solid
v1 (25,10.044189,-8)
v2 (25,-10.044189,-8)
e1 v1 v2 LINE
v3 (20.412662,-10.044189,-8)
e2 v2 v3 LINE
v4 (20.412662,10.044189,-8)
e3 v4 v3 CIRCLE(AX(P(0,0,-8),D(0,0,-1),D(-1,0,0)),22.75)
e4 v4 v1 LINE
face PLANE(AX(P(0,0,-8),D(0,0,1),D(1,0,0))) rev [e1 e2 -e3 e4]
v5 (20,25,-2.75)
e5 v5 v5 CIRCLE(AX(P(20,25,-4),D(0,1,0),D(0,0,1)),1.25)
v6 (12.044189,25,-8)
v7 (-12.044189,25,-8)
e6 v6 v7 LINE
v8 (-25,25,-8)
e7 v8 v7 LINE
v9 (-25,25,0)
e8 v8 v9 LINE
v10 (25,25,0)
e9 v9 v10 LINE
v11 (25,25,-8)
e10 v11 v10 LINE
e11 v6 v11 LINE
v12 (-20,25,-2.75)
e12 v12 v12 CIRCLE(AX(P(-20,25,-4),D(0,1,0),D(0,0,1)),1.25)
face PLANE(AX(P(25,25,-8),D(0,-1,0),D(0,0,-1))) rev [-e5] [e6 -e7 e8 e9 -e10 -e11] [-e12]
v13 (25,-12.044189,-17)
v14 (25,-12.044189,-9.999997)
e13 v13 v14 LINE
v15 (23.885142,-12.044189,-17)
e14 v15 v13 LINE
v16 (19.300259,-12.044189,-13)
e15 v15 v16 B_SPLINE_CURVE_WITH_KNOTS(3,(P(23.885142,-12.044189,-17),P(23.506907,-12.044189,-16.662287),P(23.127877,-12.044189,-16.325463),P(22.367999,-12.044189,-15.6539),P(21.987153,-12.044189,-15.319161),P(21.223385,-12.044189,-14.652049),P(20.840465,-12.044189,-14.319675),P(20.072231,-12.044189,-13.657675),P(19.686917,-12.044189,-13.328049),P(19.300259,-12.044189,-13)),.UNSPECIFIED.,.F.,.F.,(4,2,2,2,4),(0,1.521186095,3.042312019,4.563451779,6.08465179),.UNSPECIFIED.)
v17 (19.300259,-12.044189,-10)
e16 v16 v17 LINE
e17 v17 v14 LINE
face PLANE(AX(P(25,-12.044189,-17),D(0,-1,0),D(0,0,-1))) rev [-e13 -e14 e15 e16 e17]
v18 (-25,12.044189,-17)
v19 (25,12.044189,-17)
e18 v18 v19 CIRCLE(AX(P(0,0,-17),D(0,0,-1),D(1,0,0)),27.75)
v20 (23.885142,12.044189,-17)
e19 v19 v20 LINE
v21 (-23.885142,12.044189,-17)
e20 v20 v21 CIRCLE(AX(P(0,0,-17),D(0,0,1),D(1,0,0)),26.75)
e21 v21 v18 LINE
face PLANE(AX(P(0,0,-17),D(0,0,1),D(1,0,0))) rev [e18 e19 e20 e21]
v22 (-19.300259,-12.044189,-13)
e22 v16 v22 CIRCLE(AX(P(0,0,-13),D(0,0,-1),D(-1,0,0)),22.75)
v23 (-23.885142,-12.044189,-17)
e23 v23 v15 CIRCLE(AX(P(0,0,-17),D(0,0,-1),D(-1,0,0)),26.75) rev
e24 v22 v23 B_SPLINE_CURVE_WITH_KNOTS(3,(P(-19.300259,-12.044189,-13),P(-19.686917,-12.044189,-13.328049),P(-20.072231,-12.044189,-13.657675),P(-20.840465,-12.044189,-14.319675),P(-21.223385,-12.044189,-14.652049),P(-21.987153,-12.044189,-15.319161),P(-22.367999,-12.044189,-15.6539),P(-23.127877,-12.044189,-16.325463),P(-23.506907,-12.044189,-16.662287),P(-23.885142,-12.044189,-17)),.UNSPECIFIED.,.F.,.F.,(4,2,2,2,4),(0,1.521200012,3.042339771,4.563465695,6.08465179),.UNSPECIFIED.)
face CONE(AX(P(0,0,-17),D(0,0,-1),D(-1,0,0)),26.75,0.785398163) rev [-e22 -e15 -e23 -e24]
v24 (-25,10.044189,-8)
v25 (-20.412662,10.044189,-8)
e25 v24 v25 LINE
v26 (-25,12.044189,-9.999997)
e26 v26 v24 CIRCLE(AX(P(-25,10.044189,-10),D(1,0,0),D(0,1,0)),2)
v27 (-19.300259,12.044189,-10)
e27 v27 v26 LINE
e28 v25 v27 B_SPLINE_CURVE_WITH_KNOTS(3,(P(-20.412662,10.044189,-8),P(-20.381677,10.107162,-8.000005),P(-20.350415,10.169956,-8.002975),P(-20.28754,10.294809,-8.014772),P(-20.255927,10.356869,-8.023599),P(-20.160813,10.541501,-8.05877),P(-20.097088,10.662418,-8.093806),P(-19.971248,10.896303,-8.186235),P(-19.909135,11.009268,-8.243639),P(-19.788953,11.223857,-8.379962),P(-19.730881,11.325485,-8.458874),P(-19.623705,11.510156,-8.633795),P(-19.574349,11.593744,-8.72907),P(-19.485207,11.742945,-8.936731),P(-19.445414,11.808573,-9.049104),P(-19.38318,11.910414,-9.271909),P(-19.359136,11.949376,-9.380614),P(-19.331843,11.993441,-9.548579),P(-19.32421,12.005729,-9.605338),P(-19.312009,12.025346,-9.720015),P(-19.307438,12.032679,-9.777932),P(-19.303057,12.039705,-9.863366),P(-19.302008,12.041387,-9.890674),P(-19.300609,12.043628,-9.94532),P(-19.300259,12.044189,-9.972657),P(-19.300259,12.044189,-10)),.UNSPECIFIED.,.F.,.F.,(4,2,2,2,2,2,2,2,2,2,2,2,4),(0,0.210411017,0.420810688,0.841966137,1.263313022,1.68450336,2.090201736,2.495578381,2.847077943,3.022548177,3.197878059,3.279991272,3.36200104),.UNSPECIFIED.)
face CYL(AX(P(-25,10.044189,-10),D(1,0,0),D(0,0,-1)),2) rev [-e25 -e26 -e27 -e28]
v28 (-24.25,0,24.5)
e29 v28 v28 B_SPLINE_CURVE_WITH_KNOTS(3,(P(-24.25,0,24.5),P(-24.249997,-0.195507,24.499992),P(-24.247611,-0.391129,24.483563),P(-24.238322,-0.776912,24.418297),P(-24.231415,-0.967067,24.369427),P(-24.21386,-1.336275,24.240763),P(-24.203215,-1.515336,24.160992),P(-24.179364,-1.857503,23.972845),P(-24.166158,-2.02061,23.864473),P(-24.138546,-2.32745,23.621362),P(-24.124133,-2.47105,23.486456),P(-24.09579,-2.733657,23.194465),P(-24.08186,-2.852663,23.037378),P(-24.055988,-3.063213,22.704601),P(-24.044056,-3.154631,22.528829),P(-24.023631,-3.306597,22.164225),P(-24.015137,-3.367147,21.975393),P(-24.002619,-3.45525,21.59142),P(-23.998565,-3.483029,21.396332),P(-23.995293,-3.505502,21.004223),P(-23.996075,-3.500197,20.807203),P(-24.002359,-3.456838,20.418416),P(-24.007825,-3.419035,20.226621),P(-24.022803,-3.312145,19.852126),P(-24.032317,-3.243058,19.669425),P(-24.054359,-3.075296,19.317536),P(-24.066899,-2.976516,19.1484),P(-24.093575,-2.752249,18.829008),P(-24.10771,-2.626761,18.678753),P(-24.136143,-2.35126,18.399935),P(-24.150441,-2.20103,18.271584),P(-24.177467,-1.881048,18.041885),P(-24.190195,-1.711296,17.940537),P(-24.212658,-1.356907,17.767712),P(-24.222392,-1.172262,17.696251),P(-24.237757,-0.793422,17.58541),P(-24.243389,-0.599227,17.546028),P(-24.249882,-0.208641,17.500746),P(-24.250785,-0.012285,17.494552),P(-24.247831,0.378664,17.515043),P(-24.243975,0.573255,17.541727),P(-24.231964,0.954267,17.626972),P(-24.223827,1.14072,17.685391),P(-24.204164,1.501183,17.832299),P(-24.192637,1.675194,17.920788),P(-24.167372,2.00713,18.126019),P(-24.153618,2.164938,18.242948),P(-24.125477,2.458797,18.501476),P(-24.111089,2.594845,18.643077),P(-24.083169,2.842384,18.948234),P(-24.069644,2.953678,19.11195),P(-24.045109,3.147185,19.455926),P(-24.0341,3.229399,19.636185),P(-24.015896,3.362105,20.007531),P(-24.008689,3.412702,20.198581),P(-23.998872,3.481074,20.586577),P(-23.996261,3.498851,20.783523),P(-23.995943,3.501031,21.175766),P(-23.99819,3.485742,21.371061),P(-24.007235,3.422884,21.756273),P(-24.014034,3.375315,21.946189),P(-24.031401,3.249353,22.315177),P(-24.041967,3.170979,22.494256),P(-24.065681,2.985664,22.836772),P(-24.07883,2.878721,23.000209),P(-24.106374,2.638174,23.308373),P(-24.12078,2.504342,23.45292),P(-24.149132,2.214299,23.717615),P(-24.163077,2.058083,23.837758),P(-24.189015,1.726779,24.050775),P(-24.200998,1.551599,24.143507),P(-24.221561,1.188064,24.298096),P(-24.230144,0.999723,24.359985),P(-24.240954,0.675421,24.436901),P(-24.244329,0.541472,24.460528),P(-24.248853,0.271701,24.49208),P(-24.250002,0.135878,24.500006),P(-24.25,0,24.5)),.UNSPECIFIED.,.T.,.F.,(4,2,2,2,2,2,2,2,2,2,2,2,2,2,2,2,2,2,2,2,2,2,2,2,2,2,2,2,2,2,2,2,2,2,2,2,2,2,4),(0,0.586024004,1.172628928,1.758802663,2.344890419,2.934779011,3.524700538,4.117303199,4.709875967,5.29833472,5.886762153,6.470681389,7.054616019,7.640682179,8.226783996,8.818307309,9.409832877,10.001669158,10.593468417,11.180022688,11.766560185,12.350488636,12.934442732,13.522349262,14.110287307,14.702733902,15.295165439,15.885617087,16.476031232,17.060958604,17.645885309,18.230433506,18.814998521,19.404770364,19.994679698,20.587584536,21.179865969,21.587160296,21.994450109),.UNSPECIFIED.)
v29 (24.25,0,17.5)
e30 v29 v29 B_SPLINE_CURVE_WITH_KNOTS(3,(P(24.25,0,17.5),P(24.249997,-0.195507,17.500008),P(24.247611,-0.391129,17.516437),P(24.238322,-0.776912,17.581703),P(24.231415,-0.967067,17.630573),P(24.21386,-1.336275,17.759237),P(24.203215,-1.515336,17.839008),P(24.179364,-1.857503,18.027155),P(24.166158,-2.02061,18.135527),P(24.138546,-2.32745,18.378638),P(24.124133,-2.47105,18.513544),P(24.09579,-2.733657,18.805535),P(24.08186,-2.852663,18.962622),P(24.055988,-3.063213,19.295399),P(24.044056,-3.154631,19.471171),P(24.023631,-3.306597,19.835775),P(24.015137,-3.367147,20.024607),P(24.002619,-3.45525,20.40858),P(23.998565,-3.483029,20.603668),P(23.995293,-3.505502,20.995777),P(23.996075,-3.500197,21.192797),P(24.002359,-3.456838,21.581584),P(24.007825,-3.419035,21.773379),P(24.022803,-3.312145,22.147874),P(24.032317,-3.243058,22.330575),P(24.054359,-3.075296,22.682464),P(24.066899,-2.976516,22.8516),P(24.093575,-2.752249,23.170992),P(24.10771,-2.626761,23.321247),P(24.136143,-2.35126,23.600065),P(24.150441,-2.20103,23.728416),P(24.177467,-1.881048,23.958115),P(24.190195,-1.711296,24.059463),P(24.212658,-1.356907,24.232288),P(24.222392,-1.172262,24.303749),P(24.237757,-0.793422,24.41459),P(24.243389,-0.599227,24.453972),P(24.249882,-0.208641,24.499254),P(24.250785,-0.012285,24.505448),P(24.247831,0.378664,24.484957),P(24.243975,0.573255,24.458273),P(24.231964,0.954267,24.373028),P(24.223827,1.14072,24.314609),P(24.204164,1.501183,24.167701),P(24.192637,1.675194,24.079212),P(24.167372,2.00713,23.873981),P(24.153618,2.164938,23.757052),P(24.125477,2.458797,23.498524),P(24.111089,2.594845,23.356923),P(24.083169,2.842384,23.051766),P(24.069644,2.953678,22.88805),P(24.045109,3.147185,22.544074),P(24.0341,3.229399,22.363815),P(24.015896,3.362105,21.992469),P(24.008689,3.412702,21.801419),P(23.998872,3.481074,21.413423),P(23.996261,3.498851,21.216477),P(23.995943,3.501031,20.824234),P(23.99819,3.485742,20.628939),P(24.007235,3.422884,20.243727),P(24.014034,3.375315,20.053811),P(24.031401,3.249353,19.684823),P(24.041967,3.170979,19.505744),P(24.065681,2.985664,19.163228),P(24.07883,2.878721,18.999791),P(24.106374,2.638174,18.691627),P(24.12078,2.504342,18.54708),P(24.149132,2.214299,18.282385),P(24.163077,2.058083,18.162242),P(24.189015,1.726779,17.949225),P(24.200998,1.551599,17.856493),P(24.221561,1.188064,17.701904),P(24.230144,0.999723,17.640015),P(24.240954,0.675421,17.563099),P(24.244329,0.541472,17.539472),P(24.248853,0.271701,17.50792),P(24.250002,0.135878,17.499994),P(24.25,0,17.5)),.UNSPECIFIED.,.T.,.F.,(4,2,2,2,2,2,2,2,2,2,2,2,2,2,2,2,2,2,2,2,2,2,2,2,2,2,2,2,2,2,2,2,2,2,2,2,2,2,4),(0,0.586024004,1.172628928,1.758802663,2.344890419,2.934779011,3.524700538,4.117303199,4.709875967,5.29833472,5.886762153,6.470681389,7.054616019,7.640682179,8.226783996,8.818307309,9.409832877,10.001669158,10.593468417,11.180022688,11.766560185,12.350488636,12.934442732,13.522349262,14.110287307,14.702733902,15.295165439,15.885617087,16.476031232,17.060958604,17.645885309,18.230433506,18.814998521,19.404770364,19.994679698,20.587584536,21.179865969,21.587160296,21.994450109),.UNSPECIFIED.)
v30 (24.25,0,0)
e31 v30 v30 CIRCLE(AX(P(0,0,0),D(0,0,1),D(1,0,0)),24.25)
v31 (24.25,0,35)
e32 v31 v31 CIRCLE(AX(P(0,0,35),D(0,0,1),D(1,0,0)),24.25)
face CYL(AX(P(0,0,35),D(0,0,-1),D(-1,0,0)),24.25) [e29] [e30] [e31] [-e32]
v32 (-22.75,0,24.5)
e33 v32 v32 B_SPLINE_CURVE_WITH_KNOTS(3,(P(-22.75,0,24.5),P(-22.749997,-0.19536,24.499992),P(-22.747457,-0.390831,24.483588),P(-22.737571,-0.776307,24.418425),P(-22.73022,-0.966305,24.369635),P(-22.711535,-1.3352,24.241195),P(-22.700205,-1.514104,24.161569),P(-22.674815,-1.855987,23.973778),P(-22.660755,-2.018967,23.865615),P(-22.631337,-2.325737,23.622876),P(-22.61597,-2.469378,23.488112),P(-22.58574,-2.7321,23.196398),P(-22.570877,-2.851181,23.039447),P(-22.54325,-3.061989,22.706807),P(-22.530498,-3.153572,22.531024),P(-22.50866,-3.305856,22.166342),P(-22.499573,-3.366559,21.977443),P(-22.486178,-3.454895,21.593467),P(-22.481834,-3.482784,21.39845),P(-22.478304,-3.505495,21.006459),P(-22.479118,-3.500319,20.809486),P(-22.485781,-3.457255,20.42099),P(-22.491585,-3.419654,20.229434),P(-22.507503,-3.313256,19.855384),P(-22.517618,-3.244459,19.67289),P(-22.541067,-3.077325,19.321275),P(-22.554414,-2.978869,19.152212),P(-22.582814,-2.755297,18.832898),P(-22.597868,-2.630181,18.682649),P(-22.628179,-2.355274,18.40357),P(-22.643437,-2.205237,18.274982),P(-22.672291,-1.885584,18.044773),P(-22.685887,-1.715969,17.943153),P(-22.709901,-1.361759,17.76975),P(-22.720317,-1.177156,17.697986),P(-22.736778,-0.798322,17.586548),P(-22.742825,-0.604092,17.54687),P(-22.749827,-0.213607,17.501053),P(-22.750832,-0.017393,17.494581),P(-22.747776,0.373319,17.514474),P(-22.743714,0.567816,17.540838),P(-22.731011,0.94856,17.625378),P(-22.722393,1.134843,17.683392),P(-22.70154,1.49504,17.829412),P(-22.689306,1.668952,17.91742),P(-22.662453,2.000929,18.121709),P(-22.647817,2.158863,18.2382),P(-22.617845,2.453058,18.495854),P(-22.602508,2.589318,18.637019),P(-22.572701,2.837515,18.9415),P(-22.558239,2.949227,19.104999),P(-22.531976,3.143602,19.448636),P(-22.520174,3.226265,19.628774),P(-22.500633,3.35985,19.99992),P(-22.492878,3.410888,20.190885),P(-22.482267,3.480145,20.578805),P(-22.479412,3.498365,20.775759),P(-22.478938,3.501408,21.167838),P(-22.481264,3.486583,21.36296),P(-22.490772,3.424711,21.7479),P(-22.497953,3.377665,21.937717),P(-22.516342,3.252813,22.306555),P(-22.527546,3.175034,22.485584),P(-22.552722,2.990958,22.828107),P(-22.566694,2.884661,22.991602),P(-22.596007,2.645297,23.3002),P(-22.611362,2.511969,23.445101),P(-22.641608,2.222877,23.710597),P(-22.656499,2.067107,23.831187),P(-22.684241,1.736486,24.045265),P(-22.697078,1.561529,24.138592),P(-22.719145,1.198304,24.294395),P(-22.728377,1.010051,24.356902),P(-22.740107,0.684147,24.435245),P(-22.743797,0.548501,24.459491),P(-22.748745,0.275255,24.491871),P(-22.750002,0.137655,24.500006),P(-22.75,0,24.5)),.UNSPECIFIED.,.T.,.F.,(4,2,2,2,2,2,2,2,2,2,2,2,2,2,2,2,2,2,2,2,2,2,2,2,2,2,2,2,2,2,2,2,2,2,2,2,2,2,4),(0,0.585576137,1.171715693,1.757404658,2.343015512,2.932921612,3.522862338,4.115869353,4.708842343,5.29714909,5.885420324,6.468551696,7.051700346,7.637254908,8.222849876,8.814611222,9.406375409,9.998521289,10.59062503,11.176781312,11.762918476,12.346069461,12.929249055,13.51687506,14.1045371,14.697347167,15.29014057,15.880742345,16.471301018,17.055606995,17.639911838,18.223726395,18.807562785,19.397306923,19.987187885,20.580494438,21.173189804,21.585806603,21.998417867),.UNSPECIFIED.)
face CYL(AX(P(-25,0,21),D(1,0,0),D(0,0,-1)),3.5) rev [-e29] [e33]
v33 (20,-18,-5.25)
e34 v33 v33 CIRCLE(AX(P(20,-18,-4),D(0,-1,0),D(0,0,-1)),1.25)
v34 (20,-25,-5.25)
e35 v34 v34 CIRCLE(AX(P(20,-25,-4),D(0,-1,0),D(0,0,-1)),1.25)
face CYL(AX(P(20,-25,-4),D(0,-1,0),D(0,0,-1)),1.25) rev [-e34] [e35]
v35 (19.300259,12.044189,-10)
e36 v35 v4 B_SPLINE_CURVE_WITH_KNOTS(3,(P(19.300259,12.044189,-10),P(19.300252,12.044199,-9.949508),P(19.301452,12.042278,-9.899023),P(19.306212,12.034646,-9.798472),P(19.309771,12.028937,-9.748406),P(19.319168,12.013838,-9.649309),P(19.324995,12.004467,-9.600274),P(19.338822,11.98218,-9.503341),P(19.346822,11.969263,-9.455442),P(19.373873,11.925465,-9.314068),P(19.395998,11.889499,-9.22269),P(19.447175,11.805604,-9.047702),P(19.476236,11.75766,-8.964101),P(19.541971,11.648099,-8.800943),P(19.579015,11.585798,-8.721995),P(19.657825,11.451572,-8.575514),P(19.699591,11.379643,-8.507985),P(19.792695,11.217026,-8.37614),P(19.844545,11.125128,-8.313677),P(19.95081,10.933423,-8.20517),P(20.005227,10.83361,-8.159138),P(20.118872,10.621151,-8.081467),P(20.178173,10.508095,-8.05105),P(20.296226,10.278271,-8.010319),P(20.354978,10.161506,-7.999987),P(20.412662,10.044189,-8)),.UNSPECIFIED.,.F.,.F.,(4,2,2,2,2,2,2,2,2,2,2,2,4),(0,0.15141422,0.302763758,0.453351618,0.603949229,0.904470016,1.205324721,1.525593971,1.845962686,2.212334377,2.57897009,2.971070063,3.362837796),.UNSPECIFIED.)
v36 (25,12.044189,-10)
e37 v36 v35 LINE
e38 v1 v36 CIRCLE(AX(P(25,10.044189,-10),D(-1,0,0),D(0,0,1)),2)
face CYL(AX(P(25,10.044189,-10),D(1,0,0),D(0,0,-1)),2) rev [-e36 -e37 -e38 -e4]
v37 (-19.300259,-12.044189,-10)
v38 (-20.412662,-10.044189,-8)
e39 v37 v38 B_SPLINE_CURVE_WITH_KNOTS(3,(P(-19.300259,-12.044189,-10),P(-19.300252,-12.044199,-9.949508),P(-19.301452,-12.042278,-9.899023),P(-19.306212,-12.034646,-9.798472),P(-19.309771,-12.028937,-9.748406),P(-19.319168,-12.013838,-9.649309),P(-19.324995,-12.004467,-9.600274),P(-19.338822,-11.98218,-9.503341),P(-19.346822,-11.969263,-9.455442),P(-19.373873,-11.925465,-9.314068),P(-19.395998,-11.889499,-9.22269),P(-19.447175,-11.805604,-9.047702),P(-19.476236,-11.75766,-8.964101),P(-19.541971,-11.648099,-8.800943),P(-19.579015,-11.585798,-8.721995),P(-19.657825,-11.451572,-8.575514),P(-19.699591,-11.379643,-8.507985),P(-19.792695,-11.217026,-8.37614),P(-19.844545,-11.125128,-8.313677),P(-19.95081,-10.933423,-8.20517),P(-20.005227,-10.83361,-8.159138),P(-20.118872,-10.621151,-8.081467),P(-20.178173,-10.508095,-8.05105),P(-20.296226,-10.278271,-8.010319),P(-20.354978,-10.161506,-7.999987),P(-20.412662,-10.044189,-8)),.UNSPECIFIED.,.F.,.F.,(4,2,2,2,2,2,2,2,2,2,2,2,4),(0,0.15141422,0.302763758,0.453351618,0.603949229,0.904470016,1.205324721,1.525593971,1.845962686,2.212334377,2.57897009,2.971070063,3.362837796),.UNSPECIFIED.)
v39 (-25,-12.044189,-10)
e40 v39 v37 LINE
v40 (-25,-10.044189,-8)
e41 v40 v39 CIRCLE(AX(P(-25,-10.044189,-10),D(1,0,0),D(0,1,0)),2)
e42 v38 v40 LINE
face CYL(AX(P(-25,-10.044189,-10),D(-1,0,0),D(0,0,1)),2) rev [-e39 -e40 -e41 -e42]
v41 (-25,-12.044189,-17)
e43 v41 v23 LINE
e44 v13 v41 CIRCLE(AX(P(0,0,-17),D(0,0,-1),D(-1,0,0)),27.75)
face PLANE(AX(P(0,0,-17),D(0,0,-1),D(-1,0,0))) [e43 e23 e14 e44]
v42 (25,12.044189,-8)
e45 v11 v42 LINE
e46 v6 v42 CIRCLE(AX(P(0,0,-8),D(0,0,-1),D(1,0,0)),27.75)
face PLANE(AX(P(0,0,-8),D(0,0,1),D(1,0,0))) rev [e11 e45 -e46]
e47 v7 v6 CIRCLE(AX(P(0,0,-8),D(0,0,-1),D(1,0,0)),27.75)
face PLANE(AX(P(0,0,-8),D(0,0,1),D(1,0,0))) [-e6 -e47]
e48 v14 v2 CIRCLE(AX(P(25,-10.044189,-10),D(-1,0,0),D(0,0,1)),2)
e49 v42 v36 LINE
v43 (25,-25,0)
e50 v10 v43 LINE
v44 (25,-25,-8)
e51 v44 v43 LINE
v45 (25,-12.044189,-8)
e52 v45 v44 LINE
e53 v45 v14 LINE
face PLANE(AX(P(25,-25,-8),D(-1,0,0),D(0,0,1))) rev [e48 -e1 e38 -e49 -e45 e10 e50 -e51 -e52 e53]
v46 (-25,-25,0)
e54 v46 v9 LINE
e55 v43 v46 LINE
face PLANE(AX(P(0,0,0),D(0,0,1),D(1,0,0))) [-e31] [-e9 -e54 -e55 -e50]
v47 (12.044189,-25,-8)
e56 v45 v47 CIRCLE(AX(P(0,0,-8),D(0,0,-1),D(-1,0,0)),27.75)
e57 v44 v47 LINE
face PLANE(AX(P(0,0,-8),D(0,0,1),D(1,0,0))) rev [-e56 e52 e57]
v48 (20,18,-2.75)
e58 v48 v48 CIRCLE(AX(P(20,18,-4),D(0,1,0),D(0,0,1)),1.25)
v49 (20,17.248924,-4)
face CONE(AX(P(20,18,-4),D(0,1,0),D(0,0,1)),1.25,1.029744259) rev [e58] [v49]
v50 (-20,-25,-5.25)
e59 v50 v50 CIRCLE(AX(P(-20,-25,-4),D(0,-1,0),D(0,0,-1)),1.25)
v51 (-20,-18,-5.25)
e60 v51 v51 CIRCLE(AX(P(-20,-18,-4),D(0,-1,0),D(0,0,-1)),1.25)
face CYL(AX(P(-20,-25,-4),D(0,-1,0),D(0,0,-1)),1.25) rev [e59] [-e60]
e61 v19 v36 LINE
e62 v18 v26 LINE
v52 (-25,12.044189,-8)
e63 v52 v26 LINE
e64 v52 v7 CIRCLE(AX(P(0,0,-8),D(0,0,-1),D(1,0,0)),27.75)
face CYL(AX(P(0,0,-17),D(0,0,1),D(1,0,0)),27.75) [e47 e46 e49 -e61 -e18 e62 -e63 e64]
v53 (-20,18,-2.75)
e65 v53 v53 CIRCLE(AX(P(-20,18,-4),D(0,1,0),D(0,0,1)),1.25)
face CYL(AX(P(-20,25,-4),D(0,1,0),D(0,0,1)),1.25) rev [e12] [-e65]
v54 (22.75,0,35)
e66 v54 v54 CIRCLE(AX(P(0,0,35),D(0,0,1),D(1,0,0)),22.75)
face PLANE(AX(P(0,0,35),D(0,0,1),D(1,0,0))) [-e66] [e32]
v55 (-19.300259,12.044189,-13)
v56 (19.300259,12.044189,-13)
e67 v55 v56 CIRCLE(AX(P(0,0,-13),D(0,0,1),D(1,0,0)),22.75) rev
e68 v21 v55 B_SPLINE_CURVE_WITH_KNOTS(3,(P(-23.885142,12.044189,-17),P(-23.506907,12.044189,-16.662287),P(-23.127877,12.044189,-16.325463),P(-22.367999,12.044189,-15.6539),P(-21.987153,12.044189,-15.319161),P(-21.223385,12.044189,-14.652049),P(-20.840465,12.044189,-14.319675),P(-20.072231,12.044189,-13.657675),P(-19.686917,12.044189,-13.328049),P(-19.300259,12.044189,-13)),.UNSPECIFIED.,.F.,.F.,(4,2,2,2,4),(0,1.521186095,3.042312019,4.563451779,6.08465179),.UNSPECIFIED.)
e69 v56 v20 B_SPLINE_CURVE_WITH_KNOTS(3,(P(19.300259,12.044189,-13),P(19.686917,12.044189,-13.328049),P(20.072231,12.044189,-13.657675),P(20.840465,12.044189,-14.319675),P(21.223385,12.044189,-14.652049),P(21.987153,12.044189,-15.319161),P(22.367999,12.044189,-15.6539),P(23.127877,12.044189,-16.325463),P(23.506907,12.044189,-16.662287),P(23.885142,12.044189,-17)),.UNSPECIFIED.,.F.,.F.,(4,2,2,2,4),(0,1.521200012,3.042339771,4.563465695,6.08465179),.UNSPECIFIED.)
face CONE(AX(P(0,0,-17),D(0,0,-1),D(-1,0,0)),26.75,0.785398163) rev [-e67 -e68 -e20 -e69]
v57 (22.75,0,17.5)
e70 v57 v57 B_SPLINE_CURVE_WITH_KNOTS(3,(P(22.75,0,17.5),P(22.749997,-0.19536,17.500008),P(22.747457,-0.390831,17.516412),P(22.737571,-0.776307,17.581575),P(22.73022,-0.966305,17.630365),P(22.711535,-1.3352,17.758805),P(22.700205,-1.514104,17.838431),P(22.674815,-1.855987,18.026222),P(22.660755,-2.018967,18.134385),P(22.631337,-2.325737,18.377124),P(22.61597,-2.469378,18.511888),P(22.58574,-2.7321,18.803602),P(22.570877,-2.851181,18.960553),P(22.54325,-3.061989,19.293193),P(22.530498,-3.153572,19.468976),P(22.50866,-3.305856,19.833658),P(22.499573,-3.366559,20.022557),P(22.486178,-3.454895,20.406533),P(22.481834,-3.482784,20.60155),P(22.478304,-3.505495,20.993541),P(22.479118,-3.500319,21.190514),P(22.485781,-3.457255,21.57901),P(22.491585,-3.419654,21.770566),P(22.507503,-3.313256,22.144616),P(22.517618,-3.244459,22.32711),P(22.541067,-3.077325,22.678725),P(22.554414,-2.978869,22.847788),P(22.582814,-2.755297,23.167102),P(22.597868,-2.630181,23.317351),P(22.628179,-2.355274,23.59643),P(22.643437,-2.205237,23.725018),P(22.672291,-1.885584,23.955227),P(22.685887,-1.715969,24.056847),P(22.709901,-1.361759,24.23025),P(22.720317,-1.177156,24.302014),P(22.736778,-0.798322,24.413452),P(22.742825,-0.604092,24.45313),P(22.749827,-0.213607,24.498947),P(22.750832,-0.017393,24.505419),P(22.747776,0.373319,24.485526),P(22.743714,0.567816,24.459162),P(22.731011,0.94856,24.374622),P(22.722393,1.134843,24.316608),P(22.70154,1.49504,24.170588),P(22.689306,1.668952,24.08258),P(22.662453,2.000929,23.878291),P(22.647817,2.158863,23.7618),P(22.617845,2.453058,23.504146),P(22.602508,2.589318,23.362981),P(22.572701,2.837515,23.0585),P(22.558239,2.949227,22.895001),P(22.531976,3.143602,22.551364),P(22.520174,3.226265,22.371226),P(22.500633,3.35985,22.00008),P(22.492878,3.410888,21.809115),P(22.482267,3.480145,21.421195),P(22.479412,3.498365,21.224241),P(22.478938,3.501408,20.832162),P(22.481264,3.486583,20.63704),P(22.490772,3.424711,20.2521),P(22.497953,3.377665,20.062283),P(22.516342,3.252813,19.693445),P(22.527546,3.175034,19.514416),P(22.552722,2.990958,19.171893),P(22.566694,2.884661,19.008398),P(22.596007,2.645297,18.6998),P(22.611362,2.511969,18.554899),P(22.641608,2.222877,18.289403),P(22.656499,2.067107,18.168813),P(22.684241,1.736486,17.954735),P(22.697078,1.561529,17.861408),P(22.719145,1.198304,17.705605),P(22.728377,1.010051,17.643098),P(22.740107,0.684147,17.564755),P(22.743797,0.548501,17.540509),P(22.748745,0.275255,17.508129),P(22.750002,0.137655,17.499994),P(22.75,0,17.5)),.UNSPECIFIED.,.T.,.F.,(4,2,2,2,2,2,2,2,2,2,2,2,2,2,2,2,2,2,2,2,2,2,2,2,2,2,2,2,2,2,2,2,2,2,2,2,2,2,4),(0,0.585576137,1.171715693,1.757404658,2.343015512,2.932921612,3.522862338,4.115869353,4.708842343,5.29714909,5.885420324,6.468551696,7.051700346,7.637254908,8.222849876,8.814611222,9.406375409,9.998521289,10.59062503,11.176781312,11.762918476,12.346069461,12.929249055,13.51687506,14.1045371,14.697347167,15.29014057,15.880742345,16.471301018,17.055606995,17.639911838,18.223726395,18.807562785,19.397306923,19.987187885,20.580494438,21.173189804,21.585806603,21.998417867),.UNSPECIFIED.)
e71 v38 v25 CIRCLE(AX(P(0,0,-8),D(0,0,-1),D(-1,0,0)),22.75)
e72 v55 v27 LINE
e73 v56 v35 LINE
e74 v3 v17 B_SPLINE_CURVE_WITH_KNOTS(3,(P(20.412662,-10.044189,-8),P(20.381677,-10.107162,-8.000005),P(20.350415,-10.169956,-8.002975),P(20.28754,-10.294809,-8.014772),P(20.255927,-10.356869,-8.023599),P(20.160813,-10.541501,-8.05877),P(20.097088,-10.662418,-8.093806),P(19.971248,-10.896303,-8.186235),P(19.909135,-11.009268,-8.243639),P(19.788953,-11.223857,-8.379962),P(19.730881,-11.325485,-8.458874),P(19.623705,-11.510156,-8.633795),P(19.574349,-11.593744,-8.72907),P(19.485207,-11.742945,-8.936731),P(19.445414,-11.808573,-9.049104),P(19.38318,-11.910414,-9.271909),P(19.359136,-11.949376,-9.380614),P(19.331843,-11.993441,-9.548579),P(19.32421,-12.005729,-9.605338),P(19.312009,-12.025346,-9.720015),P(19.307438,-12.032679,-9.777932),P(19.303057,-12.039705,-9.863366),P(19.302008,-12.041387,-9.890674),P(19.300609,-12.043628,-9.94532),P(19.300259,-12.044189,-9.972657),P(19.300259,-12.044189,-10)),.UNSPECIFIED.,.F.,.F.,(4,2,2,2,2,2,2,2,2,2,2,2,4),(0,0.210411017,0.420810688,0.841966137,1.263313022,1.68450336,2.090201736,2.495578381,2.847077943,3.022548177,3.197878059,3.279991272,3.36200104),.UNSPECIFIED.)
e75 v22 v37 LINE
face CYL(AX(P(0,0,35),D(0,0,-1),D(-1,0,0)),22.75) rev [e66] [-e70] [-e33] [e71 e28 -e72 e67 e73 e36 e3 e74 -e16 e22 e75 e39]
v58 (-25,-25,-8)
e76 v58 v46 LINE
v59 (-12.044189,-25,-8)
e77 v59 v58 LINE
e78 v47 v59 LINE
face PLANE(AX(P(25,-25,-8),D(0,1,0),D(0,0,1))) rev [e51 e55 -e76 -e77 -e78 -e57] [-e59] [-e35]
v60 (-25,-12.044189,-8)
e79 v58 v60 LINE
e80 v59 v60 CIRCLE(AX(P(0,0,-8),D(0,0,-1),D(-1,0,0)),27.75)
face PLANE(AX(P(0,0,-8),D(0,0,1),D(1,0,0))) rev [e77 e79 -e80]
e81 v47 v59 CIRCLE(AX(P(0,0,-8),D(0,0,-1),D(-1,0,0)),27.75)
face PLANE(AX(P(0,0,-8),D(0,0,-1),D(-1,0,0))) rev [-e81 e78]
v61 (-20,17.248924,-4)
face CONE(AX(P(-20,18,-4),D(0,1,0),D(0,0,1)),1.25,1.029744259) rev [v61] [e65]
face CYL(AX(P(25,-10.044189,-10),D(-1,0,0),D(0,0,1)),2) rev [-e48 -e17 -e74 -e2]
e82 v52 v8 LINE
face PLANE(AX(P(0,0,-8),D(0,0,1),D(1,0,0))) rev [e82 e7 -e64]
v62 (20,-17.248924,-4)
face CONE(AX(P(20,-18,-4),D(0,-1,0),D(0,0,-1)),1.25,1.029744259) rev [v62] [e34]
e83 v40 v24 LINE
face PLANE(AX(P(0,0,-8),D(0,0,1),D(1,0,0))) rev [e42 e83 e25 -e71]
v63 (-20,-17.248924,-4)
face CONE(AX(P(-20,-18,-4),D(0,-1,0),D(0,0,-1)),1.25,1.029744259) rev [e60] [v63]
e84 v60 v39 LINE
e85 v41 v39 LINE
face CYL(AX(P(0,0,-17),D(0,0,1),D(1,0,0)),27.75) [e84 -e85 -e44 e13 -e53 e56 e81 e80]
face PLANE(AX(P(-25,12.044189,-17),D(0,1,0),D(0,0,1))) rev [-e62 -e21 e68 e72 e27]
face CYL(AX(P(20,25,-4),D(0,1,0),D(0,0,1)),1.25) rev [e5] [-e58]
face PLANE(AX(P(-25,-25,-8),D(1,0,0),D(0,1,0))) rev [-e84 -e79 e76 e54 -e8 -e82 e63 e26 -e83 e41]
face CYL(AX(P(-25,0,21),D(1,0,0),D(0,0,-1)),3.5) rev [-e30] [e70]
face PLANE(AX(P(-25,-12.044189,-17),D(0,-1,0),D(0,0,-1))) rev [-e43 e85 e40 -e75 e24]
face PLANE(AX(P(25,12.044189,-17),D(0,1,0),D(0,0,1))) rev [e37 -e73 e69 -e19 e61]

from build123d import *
from build123d.topology import SkipClean

# Parameters (mm, degrees)
SKETCH_1_R                  = 24.250000000000004
SKETCH_1_R_2                = 22.75
EXTRUDE_1_DEPTH             = 35
EXTRUDE_START               = 8
SKETCH_2_R                  = 22.75
EXTRUDE_2_DEPTH             = 8
HOLE_WIZARD_M3_1_AT_2_COUNT = 2
HOLE_WIZARD_M3_1_AT_2_PITCH = 40
EXTRUDE_START_2             = 9
EXTRUDE_3_DEPTH             = 9
CUT_EXTRUDE_1_DEPTH         = 52.18654608390758
CUT_EXTRUDE_1_DEPTH_BACK    = 52.18654608390758
SKETCH_6_R                  = 3.5
CHAMFER_2_SIZE              = 4
FILLET_1_R                  = 2


with BuildPart() as part:
    # 草图1 → 凸台-拉伸1 (new body)
    with BuildSketch(Plane.XY):
        Circle(SKETCH_1_R)
        Circle(SKETCH_1_R_2, mode=Mode.SUBTRACT)
    extrude(amount=EXTRUDE_1_DEPTH)

    # 草图2 → 凸台-拉伸2 (add)
    with SkipClean():  # the faces are left unmerged after this step: merging them gives an invalid solid
        with BuildSketch(Plane(origin=(0, 0, 0), x_dir=(-1, 0, 0), z_dir=(0, 0, -1)).offset(EXTRUDE_START)):
            Polygon((-24.999999999999883, -24.999999999999883), (24.999999999999876, -24.999999999999883), (24.999999999999883, 24.999999999999876), (-24.999999999999883, 24.999999999999876), align=None)
            Circle(SKETCH_2_R, mode=Mode.SUBTRACT)
        extrude(amount=-EXTRUDE_2_DEPTH)

    # 草图4 → M3 螺纹孔1 (revolve, cut)
    with SkipClean():  # the faces are left unmerged after this step: merging them gives an invalid solid
        with BuildSketch(Plane(origin=(-20, 24.999999999999876, -4), x_dir=(0, 0, 1), z_dir=(1, 0, 0))):
            Polygon((0, 0), (-1.9e-15, 7.75107577378445), (1.249999999999998, 6.999999999999999), (1.249999999999989, -1.4e-15), align=None)
        hole_wizard_m3_1 = revolve(axis=Axis((-20, 31.349999999999866, -4), (0, -1, 0)), mode=Mode.SUBTRACT)

    # M3 螺纹孔1 at 2: M3 螺纹孔1 ×2
    with SkipClean():  # the faces are left unmerged after this step: merging them gives an invalid solid
        with Locations(*[(i * HOLE_WIZARD_M3_1_AT_2_PITCH, 0, 0) for i in range(1, HOLE_WIZARD_M3_1_AT_2_COUNT)]):
            add(hole_wizard_m3_1, mode=Mode.SUBTRACT)

    # 草图5 → 凸台-拉伸3 (add)
    with SkipClean():  # the faces are left unmerged after this step: merging them gives an invalid solid
        with BuildSketch(Plane(origin=(0, 0, -8), x_dir=(-1, 0, 0), z_dir=(0, 0, -1)).offset(EXTRUDE_START_2)):
            with BuildLine():
                Line((-24.999999999999883, -12.044189470446147), (-19.30025906561863, -12.044189470446147))
                ThreePointArc((-19.30025906561863, -12.044189470446147), (1.39e-15, -22.75), (19.30025906561863, -12.044189470446147))
                Line((19.30025906561863, -12.044189470446147), (24.999999999999883, -12.044189470446147))
                ThreePointArc((24.999999999999883, -12.044189470446147), (1.7e-15, -27.75), (-24.999999999999883, -12.044189470446147))
            make_face()
            with BuildLine():
                Line((24.999999999999883, 12.044189470446147), (19.300259065618633, 12.044189470446147))
                ThreePointArc((19.300259065618633, 12.044189470446147), (6.44e-15, 22.749999999999975), (-19.3002590656186, 12.044189470446147))
                Line((-19.3002590656186, 12.044189470446147), (-24.999999999999854, 12.044189470446147))
                ThreePointArc((-24.999999999999854, 12.044189470446147), (7.86e-15, 27.749999999999975), (24.999999999999883, 12.044189470446147))
            make_face()
        extrude(amount=-EXTRUDE_3_DEPTH)

    # 草图6 → 切除-拉伸1 (cut, two sides: drawn at the far end of the back side and taken through both)
    with SkipClean():  # the faces are left unmerged after this step: merging them gives an invalid solid
        with BuildSketch(Plane(origin=(0, 0, 0), x_dir=(0, 0, -1), z_dir=(1, 0, 0)).offset(-CUT_EXTRUDE_1_DEPTH_BACK)):
            with Locations((-20.999999999999996, 0)):
                Circle(SKETCH_6_R)
        extrude(amount=CUT_EXTRUDE_1_DEPTH + CUT_EXTRUDE_1_DEPTH_BACK, mode=Mode.SUBTRACT)

    # 倒角2
    chamfer_2_edges = [part.edges().sort_by_distance(p)[0] for p in [
        (0, -22.75, -17),
        (-1.599e-14, 22.74999999999998, -17),
    ]]
    chamfer(chamfer_2_edges, length=CHAMFER_2_SIZE)

    # 圆角1
    # the kernel refuses this fillet: 2 mm, written as the material it adds along each edge
    with BuildSketch(Plane(origin=(-14.30025906561863, -12.044189470446147, -8), x_dir=(0, 1, 0), z_dir=(-1, 0, 0))) as fillet_1_piece_1_section:
        with BuildLine():
            CenterArc((FILLET_1_R, FILLET_1_R), FILLET_1_R, 180, 90)
            Line((0, FILLET_1_R), (0, 0))
            Line((0, 0), (FILLET_1_R, 0))
        make_face()
    fillet_1_piece_1 = extrude(amount=10.699740934381254, mode=Mode.PRIVATE)
    fillet_1_piece_1 = fillet_1_piece_1 - Plane(origin=(0, 0, -8.464512968517406), x_dir=(-1, 0, 0), z_dir=(0, 0, -1)) * Cylinder(22.75, 30, mode=Mode.PRIVATE)
    fillet_1_piece_1 = fillet_1_piece_1 & Plane(origin=(0, 0, -8.464512968517406), x_dir=(-0.9009009009008967, -0.43402484578184314, 0), z_dir=(0, 0, -1)) * Cylinder(27.75, 30, mode=Mode.PRIVATE)
    add(fillet_1_piece_1)
    with BuildSketch(Plane(origin=(24.999999999999883, -12.044189470446147, -8), x_dir=(0, 1, 0), z_dir=(-1, 0, 0))) as fillet_1_piece_2_section:
        with BuildLine():
            CenterArc((FILLET_1_R, FILLET_1_R), FILLET_1_R, 180, 90)
            Line((0, FILLET_1_R), (0, 0))
            Line((0, 0), (FILLET_1_R, 0))
        make_face()
    fillet_1_piece_2 = extrude(amount=10.699740934381254, mode=Mode.PRIVATE)
    fillet_1_piece_2 = fillet_1_piece_2 - Plane(origin=(0, 0, -8.464511682363383), x_dir=(-1, 0, 0), z_dir=(0, 0, -1)) * Cylinder(22.75, 30, mode=Mode.PRIVATE)
    fillet_1_piece_2 = fillet_1_piece_2 & Plane(origin=(0, 0, -8.464511682363383), x_dir=(-0.9009009009008967, -0.43402484578184314, 0), z_dir=(0, 0, -1)) * Cylinder(27.75, 30, mode=Mode.PRIVATE)
    add(fillet_1_piece_2)
    with BuildSketch(Plane(origin=(14.3002590656186, 12.044189470446147, -8), x_dir=(0, 0, -1), z_dir=(1, 0, 0))) as fillet_1_piece_3_section:
        with BuildLine():
            CenterArc((FILLET_1_R, -FILLET_1_R), FILLET_1_R, 90, 90)
            Line((0, -FILLET_1_R), (0, 0))
            Line((0, 0), (FILLET_1_R, 0))
        make_face()
    fillet_1_piece_3 = extrude(amount=10.699740934381254, mode=Mode.PRIVATE)
    fillet_1_piece_3 = fillet_1_piece_3 - Plane(origin=(-1.599e-14, -3.197e-14, -8.464512428813396), x_dir=(-0.8483630358513676, 0.5294149217778539, 0), z_dir=(0, 0, -1)) * Cylinder(22.75000000000001, 30, mode=Mode.PRIVATE)
    fillet_1_piece_3 = fillet_1_piece_3 & Plane(origin=(-1.421e-14, -2.487e-14, -8.464512428813396), x_dir=(0.9009009009008963, 0.4340248457818441, 0), z_dir=(0, 0, -1)) * Cylinder(27.75, 30, mode=Mode.PRIVATE)
    add(fillet_1_piece_3)
    with BuildSketch(Plane(origin=(-24.999999999999883, 12.044189470446147, -8), x_dir=(0, 0, -1), z_dir=(1, 0, 0))) as fillet_1_piece_4_section:
        with BuildLine():
            CenterArc((FILLET_1_R, -FILLET_1_R), FILLET_1_R, 90, 90)
            Line((0, -FILLET_1_R), (0, 0))
            Line((0, 0), (FILLET_1_R, 0))
        make_face()
    fillet_1_piece_4 = extrude(amount=10.69974093438125, mode=Mode.PRIVATE)
    fillet_1_piece_4 = fillet_1_piece_4 - Plane(origin=(-1.599e-14, -3.197e-14, -8.464512598097409), x_dir=(-0.8483630358513676, 0.5294149217778539, 0), z_dir=(0, 0, -1)) * Cylinder(22.75000000000001, 30, mode=Mode.PRIVATE)
    fillet_1_piece_4 = fillet_1_piece_4 & Plane(origin=(-1.421e-14, -2.487e-14, -8.464512598097409), x_dir=(0.9009009009008963, 0.4340248457818441, 0), z_dir=(0, 0, -1)) * Cylinder(27.75, 30, mode=Mode.PRIVATE)
    add(fillet_1_piece_4)

    # 镜向1: M3 螺纹孔1 across plane
    add(hole_wizard_m3_1.mirror(Plane.ZX), mode=Mode.SUBTRACT)

    # 镜向1 copy 1 sketch → 镜向1 copy 1 (revolve, cut)
    with BuildSketch(Plane(origin=(20, -24.999999999999876, -4), x_dir=(0, 0, 1), z_dir=(1, 0, 0))):
        Polygon((0, 0), (-1.9e-15, -7.75107577378445), (1.249999999999998, -6.999999999999999), (1.249999999999989, 1.4e-15), align=None)
    revolve(axis=Axis((20, -31.349999999999866, -4), (0, -1, 0)), mode=Mode.SUBTRACT)


solid = part.part
